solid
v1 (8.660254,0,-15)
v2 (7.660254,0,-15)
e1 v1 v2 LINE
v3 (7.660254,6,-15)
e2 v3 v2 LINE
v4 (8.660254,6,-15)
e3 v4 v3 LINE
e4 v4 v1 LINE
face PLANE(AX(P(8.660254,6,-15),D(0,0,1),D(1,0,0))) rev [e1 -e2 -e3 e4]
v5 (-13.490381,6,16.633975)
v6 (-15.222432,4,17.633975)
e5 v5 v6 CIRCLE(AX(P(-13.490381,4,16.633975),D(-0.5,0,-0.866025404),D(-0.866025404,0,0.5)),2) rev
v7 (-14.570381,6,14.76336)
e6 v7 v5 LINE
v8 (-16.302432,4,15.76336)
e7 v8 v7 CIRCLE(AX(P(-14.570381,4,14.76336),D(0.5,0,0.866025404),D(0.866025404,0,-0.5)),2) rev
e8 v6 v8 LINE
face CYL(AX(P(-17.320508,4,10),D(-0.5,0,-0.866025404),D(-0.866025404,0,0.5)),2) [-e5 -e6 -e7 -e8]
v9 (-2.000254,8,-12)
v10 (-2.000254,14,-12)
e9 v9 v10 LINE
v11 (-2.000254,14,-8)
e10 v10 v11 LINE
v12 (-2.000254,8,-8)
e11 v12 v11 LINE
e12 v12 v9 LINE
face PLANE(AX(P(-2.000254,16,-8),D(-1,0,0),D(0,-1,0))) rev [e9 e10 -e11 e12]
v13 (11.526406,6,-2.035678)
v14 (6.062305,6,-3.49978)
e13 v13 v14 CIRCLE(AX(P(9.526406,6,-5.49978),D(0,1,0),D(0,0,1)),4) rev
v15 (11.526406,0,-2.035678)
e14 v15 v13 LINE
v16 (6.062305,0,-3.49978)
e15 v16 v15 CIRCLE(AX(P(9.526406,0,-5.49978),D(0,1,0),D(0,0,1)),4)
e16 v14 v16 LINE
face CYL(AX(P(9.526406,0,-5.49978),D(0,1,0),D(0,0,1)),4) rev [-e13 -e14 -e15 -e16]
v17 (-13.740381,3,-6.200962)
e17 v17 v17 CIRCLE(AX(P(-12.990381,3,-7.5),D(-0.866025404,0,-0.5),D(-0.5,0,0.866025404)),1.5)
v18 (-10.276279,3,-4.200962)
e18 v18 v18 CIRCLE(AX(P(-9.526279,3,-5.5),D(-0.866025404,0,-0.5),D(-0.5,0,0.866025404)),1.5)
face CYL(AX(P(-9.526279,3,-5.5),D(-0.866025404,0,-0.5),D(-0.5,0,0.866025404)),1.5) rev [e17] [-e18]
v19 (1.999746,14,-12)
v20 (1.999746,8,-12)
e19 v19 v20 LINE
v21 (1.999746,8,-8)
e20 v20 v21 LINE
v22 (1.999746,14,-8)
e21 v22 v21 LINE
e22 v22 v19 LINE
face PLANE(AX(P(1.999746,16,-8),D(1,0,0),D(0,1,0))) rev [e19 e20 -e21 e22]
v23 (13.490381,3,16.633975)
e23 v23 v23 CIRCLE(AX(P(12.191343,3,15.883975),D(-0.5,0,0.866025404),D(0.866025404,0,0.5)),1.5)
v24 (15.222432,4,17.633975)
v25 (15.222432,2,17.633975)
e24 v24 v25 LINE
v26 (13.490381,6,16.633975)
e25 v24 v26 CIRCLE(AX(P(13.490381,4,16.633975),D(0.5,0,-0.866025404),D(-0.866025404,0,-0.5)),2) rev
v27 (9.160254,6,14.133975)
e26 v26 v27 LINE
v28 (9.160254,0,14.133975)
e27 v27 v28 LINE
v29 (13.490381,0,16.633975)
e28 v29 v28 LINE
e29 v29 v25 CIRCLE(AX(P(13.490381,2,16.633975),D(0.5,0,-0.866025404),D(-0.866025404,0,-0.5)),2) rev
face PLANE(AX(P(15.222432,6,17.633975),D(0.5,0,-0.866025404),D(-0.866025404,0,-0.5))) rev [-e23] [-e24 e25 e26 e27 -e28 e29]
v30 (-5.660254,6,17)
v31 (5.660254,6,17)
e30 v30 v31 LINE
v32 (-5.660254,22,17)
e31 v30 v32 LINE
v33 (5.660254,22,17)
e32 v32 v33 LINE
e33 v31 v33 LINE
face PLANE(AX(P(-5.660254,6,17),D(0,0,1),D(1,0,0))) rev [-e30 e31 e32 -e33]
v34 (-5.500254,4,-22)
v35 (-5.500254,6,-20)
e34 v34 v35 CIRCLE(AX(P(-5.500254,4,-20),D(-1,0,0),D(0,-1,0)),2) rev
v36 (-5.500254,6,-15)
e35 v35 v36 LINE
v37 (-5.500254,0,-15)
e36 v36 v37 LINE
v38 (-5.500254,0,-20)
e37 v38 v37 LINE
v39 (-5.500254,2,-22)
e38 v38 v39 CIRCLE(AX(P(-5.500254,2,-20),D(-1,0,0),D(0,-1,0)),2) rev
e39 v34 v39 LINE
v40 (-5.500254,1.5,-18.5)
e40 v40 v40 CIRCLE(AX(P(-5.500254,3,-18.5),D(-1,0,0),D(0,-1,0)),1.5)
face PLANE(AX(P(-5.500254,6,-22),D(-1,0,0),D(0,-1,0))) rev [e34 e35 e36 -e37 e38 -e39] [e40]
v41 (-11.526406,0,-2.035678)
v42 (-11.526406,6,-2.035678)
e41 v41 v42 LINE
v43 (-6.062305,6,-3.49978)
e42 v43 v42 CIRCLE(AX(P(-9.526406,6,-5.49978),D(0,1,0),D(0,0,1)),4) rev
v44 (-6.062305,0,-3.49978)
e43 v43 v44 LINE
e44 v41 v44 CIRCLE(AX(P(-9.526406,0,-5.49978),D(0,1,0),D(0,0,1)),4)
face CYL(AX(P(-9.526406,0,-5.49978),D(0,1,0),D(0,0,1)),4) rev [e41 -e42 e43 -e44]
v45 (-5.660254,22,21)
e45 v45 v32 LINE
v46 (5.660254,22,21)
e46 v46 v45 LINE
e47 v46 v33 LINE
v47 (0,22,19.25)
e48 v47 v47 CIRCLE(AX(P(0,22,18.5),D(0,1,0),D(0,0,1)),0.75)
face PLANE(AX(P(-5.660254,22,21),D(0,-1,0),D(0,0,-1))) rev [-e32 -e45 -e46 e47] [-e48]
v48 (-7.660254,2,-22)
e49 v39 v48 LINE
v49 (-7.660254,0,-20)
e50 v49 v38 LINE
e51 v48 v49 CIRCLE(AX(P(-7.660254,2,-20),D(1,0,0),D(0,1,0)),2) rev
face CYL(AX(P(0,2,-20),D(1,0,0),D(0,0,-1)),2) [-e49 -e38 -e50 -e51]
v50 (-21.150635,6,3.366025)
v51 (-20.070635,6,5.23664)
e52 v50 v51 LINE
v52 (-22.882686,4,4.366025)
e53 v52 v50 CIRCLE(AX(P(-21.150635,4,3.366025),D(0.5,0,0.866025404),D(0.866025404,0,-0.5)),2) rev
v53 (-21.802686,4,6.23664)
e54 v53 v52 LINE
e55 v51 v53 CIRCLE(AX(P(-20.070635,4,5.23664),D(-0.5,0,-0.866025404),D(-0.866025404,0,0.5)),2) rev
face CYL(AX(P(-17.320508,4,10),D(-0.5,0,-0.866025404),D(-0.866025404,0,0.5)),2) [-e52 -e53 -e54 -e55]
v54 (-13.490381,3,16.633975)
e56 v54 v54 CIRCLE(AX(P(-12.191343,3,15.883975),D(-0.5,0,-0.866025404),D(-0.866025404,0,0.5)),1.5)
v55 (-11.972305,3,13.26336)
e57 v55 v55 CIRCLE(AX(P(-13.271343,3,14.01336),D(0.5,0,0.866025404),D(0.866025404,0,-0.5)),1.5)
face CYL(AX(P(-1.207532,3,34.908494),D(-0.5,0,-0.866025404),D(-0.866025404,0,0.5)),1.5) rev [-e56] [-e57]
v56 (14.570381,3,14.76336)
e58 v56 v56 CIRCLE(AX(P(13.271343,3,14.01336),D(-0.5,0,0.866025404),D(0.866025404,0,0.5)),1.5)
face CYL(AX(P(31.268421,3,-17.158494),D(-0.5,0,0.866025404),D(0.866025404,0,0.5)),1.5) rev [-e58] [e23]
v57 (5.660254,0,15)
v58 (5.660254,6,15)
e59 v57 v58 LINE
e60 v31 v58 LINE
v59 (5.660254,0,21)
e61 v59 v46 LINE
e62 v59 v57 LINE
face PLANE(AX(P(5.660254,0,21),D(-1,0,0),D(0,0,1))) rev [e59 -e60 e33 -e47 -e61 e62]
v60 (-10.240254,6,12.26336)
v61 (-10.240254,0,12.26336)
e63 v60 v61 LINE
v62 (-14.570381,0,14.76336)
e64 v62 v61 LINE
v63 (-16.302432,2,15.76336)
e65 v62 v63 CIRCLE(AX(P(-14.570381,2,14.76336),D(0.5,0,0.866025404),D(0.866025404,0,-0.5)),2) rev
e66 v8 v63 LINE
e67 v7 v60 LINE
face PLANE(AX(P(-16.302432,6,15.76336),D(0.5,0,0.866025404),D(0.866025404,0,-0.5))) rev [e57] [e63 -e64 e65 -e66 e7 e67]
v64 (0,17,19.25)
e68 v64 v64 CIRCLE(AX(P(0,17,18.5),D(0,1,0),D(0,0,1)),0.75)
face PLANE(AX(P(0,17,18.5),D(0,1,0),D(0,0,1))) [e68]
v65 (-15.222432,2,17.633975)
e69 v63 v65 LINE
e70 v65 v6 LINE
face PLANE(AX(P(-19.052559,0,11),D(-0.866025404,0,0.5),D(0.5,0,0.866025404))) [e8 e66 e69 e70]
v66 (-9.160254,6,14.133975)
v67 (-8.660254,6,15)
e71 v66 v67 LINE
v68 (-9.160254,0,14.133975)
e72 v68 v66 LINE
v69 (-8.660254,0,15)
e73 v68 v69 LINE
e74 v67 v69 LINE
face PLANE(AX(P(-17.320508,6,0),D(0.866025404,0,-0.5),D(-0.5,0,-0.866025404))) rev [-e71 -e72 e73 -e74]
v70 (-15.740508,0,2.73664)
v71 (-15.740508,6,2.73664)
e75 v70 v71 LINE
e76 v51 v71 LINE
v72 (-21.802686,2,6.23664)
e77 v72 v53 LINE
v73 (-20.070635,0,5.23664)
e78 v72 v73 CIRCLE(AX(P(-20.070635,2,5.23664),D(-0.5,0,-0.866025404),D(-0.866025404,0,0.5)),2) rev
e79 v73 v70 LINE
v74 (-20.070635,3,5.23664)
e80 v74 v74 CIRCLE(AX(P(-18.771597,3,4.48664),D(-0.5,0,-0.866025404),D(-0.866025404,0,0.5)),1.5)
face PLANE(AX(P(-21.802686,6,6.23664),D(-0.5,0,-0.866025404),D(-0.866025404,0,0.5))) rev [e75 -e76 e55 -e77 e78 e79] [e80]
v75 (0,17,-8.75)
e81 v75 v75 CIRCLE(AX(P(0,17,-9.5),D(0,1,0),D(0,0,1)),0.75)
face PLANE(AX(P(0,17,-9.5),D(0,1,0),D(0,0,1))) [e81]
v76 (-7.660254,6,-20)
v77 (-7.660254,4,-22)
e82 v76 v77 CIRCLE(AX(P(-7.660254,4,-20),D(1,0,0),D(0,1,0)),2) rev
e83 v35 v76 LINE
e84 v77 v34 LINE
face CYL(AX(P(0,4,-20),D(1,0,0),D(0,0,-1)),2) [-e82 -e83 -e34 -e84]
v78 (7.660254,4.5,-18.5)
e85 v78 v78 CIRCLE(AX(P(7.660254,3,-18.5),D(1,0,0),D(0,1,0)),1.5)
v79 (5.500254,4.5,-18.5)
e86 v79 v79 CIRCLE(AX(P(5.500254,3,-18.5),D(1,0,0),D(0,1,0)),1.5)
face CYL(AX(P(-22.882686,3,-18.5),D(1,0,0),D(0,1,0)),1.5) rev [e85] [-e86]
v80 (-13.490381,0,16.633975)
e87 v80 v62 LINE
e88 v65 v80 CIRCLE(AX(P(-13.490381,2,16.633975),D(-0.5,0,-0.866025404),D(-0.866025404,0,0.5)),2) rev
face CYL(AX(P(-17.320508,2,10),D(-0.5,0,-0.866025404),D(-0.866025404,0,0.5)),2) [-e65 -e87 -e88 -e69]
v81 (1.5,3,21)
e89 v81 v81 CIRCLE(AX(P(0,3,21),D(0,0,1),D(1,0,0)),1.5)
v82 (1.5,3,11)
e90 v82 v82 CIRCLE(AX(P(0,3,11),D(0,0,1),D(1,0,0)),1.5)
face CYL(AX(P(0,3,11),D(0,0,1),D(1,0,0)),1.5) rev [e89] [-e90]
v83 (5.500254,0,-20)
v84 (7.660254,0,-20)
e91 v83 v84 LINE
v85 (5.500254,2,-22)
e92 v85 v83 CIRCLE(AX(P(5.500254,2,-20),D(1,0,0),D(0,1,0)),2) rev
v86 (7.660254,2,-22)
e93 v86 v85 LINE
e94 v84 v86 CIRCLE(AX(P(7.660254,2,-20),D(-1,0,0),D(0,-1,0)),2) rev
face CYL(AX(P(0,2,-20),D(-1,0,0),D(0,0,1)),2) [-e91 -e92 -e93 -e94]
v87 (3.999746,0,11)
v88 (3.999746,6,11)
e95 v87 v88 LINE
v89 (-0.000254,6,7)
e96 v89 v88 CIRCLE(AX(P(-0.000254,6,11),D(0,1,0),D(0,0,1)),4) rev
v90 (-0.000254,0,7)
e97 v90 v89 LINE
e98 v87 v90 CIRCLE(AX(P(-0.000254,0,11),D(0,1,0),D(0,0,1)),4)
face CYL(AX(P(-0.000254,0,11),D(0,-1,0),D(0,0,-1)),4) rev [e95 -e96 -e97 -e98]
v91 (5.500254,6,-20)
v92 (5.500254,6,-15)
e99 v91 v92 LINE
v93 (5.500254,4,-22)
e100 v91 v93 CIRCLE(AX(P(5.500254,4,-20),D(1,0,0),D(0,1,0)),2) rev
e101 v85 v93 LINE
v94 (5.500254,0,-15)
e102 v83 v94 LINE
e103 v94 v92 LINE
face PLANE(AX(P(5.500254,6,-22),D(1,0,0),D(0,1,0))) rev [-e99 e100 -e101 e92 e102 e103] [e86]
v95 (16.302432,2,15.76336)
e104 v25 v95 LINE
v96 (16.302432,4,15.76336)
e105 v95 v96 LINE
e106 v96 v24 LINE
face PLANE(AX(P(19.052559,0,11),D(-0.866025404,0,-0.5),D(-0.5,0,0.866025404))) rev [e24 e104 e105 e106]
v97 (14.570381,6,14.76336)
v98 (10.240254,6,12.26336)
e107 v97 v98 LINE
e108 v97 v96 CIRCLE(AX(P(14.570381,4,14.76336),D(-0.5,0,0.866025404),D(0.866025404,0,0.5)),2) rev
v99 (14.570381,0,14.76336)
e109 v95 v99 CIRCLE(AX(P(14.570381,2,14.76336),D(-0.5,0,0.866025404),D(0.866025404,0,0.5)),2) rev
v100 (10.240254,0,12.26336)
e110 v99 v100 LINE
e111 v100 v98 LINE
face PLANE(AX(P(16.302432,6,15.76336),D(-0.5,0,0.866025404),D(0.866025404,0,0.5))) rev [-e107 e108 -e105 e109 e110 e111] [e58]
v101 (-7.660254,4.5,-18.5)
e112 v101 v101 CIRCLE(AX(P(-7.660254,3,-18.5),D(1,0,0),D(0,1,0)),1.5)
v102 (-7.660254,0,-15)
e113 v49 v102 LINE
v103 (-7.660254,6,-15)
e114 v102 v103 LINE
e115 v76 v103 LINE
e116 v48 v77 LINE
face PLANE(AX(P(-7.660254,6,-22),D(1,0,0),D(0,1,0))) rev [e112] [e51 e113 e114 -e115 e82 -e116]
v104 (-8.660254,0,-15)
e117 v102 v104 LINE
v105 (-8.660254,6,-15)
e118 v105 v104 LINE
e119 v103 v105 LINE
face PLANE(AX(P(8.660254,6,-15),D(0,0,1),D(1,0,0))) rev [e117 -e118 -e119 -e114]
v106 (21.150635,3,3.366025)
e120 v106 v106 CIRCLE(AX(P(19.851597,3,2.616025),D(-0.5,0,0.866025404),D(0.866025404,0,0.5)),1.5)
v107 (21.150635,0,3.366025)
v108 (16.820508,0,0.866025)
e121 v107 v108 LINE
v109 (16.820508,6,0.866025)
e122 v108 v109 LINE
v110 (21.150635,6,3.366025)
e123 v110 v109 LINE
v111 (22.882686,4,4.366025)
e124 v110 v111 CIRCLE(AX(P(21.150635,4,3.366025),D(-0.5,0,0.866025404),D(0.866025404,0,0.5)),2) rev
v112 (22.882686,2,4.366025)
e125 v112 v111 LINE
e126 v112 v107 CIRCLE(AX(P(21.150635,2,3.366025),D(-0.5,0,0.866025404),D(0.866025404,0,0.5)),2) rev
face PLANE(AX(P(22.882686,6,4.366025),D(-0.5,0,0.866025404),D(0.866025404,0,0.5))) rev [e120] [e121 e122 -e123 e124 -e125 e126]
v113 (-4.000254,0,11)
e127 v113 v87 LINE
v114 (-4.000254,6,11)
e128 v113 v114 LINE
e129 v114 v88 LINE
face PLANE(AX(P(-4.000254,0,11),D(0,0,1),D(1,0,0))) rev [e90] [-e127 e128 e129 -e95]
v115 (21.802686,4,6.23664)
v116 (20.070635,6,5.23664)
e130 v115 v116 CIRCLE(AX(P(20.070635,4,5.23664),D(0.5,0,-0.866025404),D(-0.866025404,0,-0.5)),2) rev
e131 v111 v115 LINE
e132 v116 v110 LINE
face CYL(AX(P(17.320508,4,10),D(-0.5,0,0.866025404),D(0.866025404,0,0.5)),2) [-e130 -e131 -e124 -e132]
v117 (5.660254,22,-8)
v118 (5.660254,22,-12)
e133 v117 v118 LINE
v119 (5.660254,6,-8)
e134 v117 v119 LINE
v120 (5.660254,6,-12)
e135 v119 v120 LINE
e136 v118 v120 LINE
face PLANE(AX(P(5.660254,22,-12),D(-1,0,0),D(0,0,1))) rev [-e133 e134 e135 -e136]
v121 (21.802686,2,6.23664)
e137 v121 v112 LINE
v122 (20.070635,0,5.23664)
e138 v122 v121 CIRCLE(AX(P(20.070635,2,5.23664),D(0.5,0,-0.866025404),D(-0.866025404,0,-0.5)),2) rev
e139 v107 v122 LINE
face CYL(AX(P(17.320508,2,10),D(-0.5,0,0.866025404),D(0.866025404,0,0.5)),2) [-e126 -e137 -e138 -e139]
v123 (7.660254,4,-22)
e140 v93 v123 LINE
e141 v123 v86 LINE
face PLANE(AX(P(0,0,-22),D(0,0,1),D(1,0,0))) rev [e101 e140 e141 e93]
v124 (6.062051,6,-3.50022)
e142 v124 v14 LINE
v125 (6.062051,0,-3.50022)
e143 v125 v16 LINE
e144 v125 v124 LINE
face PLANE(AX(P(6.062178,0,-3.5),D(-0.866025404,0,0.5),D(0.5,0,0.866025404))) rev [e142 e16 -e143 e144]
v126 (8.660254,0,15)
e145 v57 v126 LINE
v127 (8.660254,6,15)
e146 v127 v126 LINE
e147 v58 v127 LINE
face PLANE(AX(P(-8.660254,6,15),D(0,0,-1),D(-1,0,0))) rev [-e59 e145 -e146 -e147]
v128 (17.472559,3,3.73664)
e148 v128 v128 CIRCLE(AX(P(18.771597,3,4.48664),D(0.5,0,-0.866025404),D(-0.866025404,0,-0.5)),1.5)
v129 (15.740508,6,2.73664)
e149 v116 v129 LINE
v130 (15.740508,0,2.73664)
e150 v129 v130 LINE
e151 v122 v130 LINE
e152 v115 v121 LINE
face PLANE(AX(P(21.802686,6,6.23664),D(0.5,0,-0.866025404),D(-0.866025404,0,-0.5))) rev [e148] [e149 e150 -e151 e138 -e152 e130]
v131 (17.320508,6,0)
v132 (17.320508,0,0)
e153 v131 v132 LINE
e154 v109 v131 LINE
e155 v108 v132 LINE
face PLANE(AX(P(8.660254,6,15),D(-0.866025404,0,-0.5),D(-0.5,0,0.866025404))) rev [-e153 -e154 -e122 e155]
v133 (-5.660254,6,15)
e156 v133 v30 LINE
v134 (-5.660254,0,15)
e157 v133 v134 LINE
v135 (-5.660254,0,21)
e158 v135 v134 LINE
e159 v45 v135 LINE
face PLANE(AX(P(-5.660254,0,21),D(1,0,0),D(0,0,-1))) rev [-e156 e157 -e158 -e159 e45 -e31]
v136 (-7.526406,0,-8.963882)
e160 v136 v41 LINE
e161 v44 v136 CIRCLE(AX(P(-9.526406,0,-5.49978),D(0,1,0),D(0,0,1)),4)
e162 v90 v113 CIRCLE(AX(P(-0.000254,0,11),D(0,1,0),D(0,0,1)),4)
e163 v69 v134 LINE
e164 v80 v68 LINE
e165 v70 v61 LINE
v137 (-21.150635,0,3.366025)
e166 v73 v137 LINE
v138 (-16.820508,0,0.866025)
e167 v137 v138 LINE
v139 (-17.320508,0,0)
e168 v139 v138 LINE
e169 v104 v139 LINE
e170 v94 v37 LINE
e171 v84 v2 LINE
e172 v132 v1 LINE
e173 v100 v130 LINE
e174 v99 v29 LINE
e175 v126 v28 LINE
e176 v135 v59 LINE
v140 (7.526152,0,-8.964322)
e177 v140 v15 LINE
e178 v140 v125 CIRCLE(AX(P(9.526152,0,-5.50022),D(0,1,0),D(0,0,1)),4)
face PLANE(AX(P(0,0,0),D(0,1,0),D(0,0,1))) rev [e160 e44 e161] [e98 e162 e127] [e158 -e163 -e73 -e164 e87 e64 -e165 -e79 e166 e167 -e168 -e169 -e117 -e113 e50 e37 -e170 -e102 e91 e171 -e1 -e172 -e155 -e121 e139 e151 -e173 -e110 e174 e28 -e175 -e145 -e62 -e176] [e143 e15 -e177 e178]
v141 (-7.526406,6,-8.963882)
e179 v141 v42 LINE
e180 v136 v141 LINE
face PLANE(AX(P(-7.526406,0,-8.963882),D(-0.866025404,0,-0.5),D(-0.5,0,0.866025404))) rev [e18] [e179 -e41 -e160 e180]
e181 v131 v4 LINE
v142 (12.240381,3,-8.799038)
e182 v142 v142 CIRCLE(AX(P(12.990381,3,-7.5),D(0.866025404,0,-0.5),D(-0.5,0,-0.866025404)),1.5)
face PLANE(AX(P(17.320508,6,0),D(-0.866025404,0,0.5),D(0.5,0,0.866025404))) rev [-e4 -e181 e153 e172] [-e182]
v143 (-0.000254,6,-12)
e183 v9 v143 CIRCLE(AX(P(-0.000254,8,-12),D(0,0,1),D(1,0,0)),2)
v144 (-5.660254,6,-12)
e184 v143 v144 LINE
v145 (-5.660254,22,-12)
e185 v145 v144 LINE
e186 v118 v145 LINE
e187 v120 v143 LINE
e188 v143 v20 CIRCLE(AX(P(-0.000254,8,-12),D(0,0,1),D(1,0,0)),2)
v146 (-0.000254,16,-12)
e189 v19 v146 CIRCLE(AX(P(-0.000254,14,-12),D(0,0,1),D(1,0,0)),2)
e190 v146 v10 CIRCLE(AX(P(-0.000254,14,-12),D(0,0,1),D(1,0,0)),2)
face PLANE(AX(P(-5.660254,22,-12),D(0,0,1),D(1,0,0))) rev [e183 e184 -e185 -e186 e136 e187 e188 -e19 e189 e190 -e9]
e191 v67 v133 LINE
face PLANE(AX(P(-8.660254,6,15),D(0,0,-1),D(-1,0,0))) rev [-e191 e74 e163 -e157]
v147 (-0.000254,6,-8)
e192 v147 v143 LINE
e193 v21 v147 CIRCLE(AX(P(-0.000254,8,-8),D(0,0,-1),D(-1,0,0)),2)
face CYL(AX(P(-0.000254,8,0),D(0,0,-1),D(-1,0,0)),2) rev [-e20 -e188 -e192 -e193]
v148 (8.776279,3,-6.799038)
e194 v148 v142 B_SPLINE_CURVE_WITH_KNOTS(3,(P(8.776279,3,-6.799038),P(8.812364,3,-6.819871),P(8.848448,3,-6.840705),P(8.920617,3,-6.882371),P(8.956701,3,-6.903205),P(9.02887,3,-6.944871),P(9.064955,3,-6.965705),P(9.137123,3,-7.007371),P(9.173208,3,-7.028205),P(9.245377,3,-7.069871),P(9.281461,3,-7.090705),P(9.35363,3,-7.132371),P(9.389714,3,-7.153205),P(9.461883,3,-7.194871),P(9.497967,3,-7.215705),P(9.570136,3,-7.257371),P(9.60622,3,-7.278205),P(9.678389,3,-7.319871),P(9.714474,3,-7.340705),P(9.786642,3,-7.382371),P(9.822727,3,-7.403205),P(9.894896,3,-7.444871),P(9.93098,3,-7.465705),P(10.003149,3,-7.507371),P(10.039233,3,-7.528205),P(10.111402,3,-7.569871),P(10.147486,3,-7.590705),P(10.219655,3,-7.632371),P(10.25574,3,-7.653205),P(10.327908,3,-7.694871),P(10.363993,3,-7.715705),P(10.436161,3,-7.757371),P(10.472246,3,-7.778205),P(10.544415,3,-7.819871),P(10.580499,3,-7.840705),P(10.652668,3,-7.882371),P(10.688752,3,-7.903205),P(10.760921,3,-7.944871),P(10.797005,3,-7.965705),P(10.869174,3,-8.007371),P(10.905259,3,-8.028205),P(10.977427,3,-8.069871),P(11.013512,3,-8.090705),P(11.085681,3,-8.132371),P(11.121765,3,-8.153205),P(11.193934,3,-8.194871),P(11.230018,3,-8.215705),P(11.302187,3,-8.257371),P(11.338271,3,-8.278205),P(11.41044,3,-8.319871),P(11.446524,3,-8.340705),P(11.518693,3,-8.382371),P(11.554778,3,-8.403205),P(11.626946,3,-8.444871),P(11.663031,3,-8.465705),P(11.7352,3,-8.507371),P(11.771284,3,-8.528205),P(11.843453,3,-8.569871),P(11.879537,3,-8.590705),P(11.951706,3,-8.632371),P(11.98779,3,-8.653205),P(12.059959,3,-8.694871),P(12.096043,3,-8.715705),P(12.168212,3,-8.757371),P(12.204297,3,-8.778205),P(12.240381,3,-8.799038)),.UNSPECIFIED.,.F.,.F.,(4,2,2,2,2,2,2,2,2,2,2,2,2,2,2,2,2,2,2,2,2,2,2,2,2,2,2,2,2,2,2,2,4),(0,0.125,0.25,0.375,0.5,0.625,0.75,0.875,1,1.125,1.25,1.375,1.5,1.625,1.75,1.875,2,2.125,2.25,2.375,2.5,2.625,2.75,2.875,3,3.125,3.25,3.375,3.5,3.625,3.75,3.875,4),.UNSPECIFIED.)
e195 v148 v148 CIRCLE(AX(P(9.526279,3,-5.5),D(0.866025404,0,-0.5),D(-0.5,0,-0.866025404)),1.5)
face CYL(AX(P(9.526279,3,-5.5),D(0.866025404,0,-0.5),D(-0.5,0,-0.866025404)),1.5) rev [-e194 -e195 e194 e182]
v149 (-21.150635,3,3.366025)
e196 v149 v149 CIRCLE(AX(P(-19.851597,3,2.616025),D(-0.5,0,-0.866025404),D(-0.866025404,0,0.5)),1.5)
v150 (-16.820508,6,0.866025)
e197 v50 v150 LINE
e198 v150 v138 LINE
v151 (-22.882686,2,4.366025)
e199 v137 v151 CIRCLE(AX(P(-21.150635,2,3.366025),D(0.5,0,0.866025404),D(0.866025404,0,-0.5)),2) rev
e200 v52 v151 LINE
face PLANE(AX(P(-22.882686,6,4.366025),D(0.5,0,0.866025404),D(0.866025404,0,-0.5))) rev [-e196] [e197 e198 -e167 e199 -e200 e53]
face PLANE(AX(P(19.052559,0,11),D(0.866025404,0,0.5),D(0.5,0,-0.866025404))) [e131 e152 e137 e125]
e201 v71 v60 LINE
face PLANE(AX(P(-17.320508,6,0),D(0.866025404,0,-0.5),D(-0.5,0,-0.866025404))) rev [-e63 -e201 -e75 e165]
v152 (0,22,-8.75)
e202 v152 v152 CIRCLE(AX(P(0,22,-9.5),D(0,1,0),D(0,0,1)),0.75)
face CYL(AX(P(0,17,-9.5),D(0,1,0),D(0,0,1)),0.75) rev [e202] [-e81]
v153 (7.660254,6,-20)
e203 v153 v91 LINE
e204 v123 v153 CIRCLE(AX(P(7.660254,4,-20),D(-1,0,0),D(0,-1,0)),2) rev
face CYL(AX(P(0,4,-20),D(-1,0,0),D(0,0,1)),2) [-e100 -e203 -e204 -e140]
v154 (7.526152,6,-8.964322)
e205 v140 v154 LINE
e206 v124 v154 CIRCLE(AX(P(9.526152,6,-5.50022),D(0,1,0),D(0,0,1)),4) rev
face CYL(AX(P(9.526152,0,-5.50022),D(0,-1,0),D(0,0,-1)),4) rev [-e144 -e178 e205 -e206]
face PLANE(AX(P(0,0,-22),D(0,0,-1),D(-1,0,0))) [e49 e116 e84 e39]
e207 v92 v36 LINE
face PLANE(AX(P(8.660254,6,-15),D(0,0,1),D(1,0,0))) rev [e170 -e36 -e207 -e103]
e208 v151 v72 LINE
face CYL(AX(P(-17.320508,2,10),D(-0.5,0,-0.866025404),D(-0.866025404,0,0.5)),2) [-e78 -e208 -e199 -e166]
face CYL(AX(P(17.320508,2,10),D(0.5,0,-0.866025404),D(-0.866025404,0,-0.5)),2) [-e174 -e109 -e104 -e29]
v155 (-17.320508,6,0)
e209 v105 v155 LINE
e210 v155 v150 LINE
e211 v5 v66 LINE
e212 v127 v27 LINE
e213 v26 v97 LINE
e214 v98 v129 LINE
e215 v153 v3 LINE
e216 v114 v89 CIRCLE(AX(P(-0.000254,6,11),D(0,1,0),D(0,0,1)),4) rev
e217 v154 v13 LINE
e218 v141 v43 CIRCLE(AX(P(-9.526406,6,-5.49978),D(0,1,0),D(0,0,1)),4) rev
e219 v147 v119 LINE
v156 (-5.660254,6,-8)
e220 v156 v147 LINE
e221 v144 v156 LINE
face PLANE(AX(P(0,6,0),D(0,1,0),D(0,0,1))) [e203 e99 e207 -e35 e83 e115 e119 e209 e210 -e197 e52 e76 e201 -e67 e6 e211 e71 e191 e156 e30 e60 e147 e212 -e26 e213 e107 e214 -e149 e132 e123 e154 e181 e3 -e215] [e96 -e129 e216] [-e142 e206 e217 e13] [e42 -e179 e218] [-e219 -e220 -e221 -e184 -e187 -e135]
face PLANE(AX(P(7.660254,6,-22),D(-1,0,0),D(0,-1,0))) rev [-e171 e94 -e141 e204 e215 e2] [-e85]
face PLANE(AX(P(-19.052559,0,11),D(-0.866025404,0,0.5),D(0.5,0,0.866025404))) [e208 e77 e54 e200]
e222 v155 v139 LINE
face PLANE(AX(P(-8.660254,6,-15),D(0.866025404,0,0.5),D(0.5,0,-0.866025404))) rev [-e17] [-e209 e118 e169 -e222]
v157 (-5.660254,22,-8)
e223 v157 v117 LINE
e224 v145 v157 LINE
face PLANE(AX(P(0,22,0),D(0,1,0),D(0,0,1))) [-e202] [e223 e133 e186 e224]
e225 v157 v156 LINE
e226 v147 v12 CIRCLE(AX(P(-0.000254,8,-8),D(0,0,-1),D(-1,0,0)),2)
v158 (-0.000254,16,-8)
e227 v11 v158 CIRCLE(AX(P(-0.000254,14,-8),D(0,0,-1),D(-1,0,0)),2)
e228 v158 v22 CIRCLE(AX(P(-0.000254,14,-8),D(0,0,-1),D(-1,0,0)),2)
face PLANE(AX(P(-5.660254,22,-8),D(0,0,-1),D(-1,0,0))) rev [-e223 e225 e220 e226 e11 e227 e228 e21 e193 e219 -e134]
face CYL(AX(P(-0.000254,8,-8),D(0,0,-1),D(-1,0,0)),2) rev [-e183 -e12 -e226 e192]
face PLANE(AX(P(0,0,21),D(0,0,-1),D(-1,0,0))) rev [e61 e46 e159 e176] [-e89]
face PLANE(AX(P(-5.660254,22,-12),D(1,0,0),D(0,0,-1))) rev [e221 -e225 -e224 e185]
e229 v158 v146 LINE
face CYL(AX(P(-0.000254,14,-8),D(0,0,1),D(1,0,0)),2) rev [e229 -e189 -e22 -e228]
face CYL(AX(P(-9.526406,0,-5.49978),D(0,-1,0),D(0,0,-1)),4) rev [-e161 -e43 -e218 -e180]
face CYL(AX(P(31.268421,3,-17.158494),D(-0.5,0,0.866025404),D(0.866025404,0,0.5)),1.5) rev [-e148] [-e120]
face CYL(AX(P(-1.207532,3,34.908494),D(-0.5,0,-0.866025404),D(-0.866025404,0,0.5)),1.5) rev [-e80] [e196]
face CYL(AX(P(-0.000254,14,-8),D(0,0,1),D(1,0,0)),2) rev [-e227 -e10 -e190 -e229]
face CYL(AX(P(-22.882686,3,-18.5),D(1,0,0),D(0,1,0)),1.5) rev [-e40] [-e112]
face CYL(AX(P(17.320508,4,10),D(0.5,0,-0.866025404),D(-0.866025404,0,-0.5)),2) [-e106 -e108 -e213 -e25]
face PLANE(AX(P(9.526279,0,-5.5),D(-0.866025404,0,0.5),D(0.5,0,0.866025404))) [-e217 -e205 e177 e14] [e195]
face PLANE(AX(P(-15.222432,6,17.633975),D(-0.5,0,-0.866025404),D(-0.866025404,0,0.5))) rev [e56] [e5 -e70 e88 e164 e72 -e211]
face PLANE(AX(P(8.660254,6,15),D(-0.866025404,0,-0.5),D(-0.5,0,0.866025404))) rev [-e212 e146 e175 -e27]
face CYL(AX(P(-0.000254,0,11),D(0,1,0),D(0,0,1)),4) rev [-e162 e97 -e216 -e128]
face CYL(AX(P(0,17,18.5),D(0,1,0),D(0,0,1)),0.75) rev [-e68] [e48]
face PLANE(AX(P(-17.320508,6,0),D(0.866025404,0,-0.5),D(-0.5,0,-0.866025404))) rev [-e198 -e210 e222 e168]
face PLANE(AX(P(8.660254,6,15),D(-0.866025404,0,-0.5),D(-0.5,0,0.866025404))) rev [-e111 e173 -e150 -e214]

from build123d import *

# Parameters (mm, degrees)
BOSS_EXTRUDE1_DEPTH = 6
SKETCH2_W           = 2.16
SKETCH2_H           = 6
BOSS_EXTRUDE2_DEPTH = 7
SKETCH4_W           = 2.16
SKETCH4_H           = 6
BOSS_EXTRUDE3_DEPTH = 7
SKETCH5_W           = 2.16
SKETCH5_H           = 6
BOSS_EXTRUDE4_DEPTH = 7
SKETCH6_W           = 2.16
SKETCH6_H           = 6
BOSS_EXTRUDE5_DEPTH = 7
SKETCH7_W           = 2.16
SKETCH7_H           = 6
BOSS_EXTRUDE6_DEPTH = 7
SKETCH9_W           = 2.16
SKETCH9_H           = 6
BOSS_EXTRUDE7_DEPTH = 7
SKETCH11_W          = 11.320508076
SKETCH11_H          = 22
BOSS_EXTRUDE8_DEPTH = 6
SKETCH13_W          = 11.320508076
SKETCH13_H          = 2
CUT_EXTRUDE1_DEPTH  = 16
SKETCH14_W          = 11.320508076
SKETCH14_H          = 4
BOSS_EXTRUDE9_DEPTH = 16
SKETCH22_W          = 4
SKETCH22_H          = 10
CUT_EXTRUDE8_DEPTH  = 4
SKETCH23_R          = 1.5
CUT_EXTRUDE9_DEPTH  = 44.598981412
SKETCH24_R          = 1.5
CUT_EXTRUDE10_DEPTH = 45.916354208
SKETCH25_R          = 1.5
CUT_EXTRUDE11_DEPTH = 45.285561147
SKETCH26_W          = 8
SKETCH26_H          = 4
CUT_EXTRUDE12_DEPTH = 6
FILLET1_R           = 4
CUT_EXTRUDE13_DEPTH = 6
FILLET2_R           = 4
CUT_EXTRUDE14_DEPTH = 6
FILLET3_R           = 4
SKETCH34_R          = 1.5
CUT_EXTRUDE15_DEPTH = 4
SKETCH35_R          = 1.5
CUT_EXTRUDE16_DEPTH = 4
SKETCH36_R          = 1.5
CUT_EXTRUDE17_DEPTH = 10
FILLET4_R           = 2
FILLET5_R           = 2
SKETCH37_R          = 0.75
CUT_EXTRUDE19_DEPTH = 5
SKETCH39_R          = 0.75
CUT_EXTRUDE20_DEPTH = 5
FILLET6_R           = 2


with BuildPart() as part:
    # Sketch1 → Boss-Extrude1 (new body)
    with BuildSketch(Plane(origin=(0, 0, 0), x_dir=(1, 0, 0), z_dir=(0, 1, 0))):
        Polygon((17.320508076, 0), (8.660254038, 15), (-8.660254038, 15), (-17.320508076, 0), (-8.660254038, -15), (8.660254038, -15), align=None)
    extrude(amount=BOSS_EXTRUDE1_DEPTH)

    # Sketch2 → Boss-Extrude2 (add)
    with BuildSketch(Plane(origin=(12.990381057, 0, 7.5), x_dir=(0.4999999999999997, 0, -0.8660254037844388), z_dir=(0.8660254037844389, 0, 0.49999999999999983))):
        with Locations((-6.580254038, 3)):
            Rectangle(SKETCH2_W, SKETCH2_H)
    extrude(amount=BOSS_EXTRUDE2_DEPTH)

    # Sketch4 → Boss-Extrude3 (add)
    with BuildSketch(Plane(origin=(12.990381057, 0, 7.5), x_dir=(0.4999999999999997, 0, -0.8660254037844388), z_dir=(0.8660254037844389, 0, 0.49999999999999983))):
        with Locations((6.580254038, 3)):
            Rectangle(SKETCH4_W, SKETCH4_H)
    extrude(amount=BOSS_EXTRUDE3_DEPTH)

    # Sketch5 → Boss-Extrude4 (add)
    with BuildSketch(Plane(origin=(-12.990381057, 0, 7.5), x_dir=(0.4999999999999999, 0, 0.8660254037844387), z_dir=(-0.8660254037844388, 0, 0.49999999999999994))):
        with Locations((-6.580254038, 3)):
            Rectangle(SKETCH5_W, SKETCH5_H)
    extrude(amount=BOSS_EXTRUDE4_DEPTH)

    # Sketch6 → Boss-Extrude5 (add)
    with BuildSketch(Plane(origin=(-12.990381057, 0, 7.5), x_dir=(0.4999999999999999, 0, 0.8660254037844387), z_dir=(-0.8660254037844388, 0, 0.49999999999999994))):
        with Locations((6.580254038, 3)):
            Rectangle(SKETCH6_W, SKETCH6_H)
    extrude(amount=BOSS_EXTRUDE5_DEPTH)

    # Sketch7 → Boss-Extrude6 (add)
    with BuildSketch(Plane(origin=(0, 0, -15), x_dir=(-1, 0, 0), z_dir=(0, 0, -1))):
        with Locations((-6.580254038, 3)):
            Rectangle(SKETCH7_W, SKETCH7_H)
    extrude(amount=BOSS_EXTRUDE6_DEPTH)

    # Sketch9 → Boss-Extrude7 (add)
    with BuildSketch(Plane(origin=(0, 0, -15), x_dir=(-1, 0, 0), z_dir=(0, 0, -1))):
        with Locations((6.580254038, 3)):
            Rectangle(SKETCH9_W, SKETCH9_H)
    extrude(amount=BOSS_EXTRUDE7_DEPTH)

    # Sketch11 → Boss-Extrude8 (add)
    with BuildSketch(Plane.XY.offset(15)):
        with Locations((0, 11)):
            Rectangle(SKETCH11_W, SKETCH11_H)
    extrude(amount=BOSS_EXTRUDE8_DEPTH)

    # Sketch13 → Cut-Extrude1 (cut)
    with BuildSketch(Plane(origin=(0, 22, 0), x_dir=(1, 0, 0), z_dir=(0, 1, 0))):
        with Locations((0, -16)):
            Rectangle(SKETCH13_W, SKETCH13_H)
    extrude(amount=-CUT_EXTRUDE1_DEPTH, mode=Mode.SUBTRACT)

    # Sketch14 → Boss-Extrude9 (add)
    with BuildSketch(Plane(origin=(0, 6, 0), x_dir=(1, 0, 0), z_dir=(0, 1, 0))):
        with Locations((0, 10)):
            Rectangle(SKETCH14_W, SKETCH14_H)
    extrude(amount=BOSS_EXTRUDE9_DEPTH)

    # Sketch22 → Cut-Extrude8 (cut)
    with BuildSketch(Plane(origin=(0, 0, -12), x_dir=(-1, 0, 0), z_dir=(0, 0, -1))):
        with Locations((0.000254038, 11)):
            Rectangle(SKETCH22_W, SKETCH22_H)
    extrude(amount=-CUT_EXTRUDE8_DEPTH, mode=Mode.SUBTRACT)

    # Sketch23 → Cut-Extrude9 (cut, through all)
    with BuildSketch(Plane(origin=(7.660254038, 0, 0), x_dir=(0, 0, -1), z_dir=(1, 0, 0))):
        with Locations(Location((18.5, 3, 0), (0, 0, 90))):
            Circle(SKETCH23_R)
    extrude(amount=-CUT_EXTRUDE9_DEPTH, mode=Mode.SUBTRACT)

    # Sketch24 → Cut-Extrude10 (cut, through all)
    with BuildSketch(Plane(origin=(-3.830127019, 0, 6.633974596), x_dir=(0.8660254037844388, 0, 0.4999999999999997), z_dir=(-0.49999999999999983, 0, 0.8660254037844389))):
        with Locations((18.5, 3)):
            Circle(SKETCH24_R)
    extrude(amount=-CUT_EXTRUDE10_DEPTH, mode=Mode.SUBTRACT)

    # Sketch25 → Cut-Extrude11 (cut, through all)
    with BuildSketch(Plane(origin=(-3.830127019, 0, -6.633974596), x_dir=(-0.8660254037844387, 0, 0.4999999999999999), z_dir=(-0.4999999999999999, 0, -0.8660254037844387))):
        with Locations((18.5, 3)):
            Circle(SKETCH25_R)
    extrude(amount=-CUT_EXTRUDE11_DEPTH, mode=Mode.SUBTRACT)

    # Sketch26 → Cut-Extrude12 (cut)
    with BuildSketch(Plane(origin=(0, 6, 0), x_dir=(1, 0, 0), z_dir=(0, 1, 0))):
        with Locations((-0.000254038, -9)):
            Rectangle(SKETCH26_W, SKETCH26_H)
    extrude(amount=-CUT_EXTRUDE12_DEPTH, mode=Mode.SUBTRACT)

    # Fillet1
    fillet1_edges = [part.edges().sort_by_distance(p)[0] for p in [
        (-4.000254038, 3, 7),
        (3.999745962, 3, 7),
    ]]
    fillet(fillet1_edges, radius=FILLET1_R - 0.0001)  # a hair under: the kernel refuses the full size

    # Sketch32 → Cut-Extrude13 (cut)
    with BuildSketch(Plane(origin=(0, 6, 0), x_dir=(1, 0, 0), z_dir=(0, 1, 0))):
        Polygon((7.526152423, 8.964321618), (4.062050808, 6.964321618), (8.062304845, 0.035678382), (11.526406461, 2.035678382), align=None)
    extrude(amount=-CUT_EXTRUDE13_DEPTH, mode=Mode.SUBTRACT)

    # Fillet2
    fillet2_edges = [part.edges().sort_by_distance(p)[0] for p in [
        (8.062304845, 3, -0.035678382),
        (4.062050808, 3, -6.964321618),
    ]]
    fillet(fillet2_edges, radius=FILLET2_R - 0.0001)  # a hair under: the kernel refuses the full size

    # Sketch33 → Cut-Extrude14 (cut)
    with BuildSketch(Plane(origin=(0, 6, 0), x_dir=(1, 0, 0), z_dir=(0, 1, 0))):
        Polygon((-7.526406461, 8.963881612), (-11.526406461, 2.035678382), (-8.062304845, 0.035678382), (-4.062304845, 6.963881612), align=None)
    extrude(amount=-CUT_EXTRUDE14_DEPTH, mode=Mode.SUBTRACT)

    # Fillet3
    fillet3_edges = [part.edges().sort_by_distance(p)[0] for p in [
        (-8.062304845, 3, -0.035678382),
        (-4.062304845, 3, -6.963881612),
    ]]
    fillet(fillet3_edges, radius=FILLET3_R - 0.0001)  # a hair under: the kernel refuses the full size

    # Sketch34 → Cut-Extrude15 (cut)
    with BuildSketch(Plane(origin=(-12.990381057, 0, -7.5), x_dir=(-0.5, 0, 0.8660254037844386), z_dir=(-0.8660254037844387, 0, -0.5000000000000001))):
        with Locations((0, 3)):
            Circle(SKETCH34_R)
    extrude(amount=-CUT_EXTRUDE15_DEPTH, mode=Mode.SUBTRACT)

    # Sketch35 → Cut-Extrude16 (cut)
    with BuildSketch(Plane(origin=(12.990381057, 0, -7.5), x_dir=(-0.5000000000000003, 0, -0.8660254037844386), z_dir=(0.8660254037844385, 0, -0.5000000000000002))):
        with Locations((0, 3)):
            Circle(SKETCH35_R)
    extrude(amount=-CUT_EXTRUDE16_DEPTH, mode=Mode.SUBTRACT)

    # Sketch36 → Cut-Extrude17 (cut)
    with BuildSketch(Plane.XY.offset(21)):
        with Locations((0, 3)):
            Circle(SKETCH36_R)
    extrude(amount=-CUT_EXTRUDE17_DEPTH, mode=Mode.SUBTRACT)

    # Fillet4
    fillet4_edges = [part.edges().sort_by_distance(p)[0] for p in [
        (1.999745962, 16, -10),
        (-2.000254038, 16, -10),
    ]]
    fillet(fillet4_edges, radius=FILLET4_R - 0.0001)  # a hair under: the kernel refuses the full size

    # Fillet5
    fillet5_edges = [part.edges().sort_by_distance(p)[0] for p in [
        (1.999745962, 6, -10),
        (-2.000254038, 6, -10),
    ]]
    fillet(fillet5_edges, radius=FILLET5_R - 0.0001)  # a hair under: the kernel refuses the full size

    # Sketch37 → Cut-Extrude19 (cut)
    with BuildSketch(Plane(origin=(0, 22, 0), x_dir=(1, 0, 0), z_dir=(0, 1, 0))):
        with Locations(Location((0, 9.5, 0), (0, 0, 270))):
            Circle(SKETCH37_R)
    extrude(amount=-CUT_EXTRUDE19_DEPTH, mode=Mode.SUBTRACT)

    # Sketch39 → Cut-Extrude20 (cut)
    with BuildSketch(Plane(origin=(0, 22, 0), x_dir=(1, 0, 0), z_dir=(0, 1, 0))):
        with Locations(Location((0, -18.5, 0), (0, 0, 270))):
            Circle(SKETCH39_R)
    extrude(amount=-CUT_EXTRUDE20_DEPTH, mode=Mode.SUBTRACT)

    # Fillet6
    fillet6_edges = [part.edges().sort_by_distance(p)[0] for p in [
        (15.762431864, 6, 16.69866716),
        (15.762431864, 0, 16.69866716),
        (22.342685902, 0, 5.30133284),
        (22.342685902, 6, 5.30133284),
        (-22.342685902, 0, 5.30133284),
        (-22.342685902, 6, 5.30133284),
        (-15.762431864, 0, 16.69866716),
        (-15.762431864, 6, 16.69866716),
        (6.580254038, 6, -22),
        (6.580254038, 0, -22),
        (-6.580254038, 0, -22),
        (-6.580254038, 6, -22),
    ]]
    fillet(fillet6_edges, radius=FILLET6_R)


solid = part.part
